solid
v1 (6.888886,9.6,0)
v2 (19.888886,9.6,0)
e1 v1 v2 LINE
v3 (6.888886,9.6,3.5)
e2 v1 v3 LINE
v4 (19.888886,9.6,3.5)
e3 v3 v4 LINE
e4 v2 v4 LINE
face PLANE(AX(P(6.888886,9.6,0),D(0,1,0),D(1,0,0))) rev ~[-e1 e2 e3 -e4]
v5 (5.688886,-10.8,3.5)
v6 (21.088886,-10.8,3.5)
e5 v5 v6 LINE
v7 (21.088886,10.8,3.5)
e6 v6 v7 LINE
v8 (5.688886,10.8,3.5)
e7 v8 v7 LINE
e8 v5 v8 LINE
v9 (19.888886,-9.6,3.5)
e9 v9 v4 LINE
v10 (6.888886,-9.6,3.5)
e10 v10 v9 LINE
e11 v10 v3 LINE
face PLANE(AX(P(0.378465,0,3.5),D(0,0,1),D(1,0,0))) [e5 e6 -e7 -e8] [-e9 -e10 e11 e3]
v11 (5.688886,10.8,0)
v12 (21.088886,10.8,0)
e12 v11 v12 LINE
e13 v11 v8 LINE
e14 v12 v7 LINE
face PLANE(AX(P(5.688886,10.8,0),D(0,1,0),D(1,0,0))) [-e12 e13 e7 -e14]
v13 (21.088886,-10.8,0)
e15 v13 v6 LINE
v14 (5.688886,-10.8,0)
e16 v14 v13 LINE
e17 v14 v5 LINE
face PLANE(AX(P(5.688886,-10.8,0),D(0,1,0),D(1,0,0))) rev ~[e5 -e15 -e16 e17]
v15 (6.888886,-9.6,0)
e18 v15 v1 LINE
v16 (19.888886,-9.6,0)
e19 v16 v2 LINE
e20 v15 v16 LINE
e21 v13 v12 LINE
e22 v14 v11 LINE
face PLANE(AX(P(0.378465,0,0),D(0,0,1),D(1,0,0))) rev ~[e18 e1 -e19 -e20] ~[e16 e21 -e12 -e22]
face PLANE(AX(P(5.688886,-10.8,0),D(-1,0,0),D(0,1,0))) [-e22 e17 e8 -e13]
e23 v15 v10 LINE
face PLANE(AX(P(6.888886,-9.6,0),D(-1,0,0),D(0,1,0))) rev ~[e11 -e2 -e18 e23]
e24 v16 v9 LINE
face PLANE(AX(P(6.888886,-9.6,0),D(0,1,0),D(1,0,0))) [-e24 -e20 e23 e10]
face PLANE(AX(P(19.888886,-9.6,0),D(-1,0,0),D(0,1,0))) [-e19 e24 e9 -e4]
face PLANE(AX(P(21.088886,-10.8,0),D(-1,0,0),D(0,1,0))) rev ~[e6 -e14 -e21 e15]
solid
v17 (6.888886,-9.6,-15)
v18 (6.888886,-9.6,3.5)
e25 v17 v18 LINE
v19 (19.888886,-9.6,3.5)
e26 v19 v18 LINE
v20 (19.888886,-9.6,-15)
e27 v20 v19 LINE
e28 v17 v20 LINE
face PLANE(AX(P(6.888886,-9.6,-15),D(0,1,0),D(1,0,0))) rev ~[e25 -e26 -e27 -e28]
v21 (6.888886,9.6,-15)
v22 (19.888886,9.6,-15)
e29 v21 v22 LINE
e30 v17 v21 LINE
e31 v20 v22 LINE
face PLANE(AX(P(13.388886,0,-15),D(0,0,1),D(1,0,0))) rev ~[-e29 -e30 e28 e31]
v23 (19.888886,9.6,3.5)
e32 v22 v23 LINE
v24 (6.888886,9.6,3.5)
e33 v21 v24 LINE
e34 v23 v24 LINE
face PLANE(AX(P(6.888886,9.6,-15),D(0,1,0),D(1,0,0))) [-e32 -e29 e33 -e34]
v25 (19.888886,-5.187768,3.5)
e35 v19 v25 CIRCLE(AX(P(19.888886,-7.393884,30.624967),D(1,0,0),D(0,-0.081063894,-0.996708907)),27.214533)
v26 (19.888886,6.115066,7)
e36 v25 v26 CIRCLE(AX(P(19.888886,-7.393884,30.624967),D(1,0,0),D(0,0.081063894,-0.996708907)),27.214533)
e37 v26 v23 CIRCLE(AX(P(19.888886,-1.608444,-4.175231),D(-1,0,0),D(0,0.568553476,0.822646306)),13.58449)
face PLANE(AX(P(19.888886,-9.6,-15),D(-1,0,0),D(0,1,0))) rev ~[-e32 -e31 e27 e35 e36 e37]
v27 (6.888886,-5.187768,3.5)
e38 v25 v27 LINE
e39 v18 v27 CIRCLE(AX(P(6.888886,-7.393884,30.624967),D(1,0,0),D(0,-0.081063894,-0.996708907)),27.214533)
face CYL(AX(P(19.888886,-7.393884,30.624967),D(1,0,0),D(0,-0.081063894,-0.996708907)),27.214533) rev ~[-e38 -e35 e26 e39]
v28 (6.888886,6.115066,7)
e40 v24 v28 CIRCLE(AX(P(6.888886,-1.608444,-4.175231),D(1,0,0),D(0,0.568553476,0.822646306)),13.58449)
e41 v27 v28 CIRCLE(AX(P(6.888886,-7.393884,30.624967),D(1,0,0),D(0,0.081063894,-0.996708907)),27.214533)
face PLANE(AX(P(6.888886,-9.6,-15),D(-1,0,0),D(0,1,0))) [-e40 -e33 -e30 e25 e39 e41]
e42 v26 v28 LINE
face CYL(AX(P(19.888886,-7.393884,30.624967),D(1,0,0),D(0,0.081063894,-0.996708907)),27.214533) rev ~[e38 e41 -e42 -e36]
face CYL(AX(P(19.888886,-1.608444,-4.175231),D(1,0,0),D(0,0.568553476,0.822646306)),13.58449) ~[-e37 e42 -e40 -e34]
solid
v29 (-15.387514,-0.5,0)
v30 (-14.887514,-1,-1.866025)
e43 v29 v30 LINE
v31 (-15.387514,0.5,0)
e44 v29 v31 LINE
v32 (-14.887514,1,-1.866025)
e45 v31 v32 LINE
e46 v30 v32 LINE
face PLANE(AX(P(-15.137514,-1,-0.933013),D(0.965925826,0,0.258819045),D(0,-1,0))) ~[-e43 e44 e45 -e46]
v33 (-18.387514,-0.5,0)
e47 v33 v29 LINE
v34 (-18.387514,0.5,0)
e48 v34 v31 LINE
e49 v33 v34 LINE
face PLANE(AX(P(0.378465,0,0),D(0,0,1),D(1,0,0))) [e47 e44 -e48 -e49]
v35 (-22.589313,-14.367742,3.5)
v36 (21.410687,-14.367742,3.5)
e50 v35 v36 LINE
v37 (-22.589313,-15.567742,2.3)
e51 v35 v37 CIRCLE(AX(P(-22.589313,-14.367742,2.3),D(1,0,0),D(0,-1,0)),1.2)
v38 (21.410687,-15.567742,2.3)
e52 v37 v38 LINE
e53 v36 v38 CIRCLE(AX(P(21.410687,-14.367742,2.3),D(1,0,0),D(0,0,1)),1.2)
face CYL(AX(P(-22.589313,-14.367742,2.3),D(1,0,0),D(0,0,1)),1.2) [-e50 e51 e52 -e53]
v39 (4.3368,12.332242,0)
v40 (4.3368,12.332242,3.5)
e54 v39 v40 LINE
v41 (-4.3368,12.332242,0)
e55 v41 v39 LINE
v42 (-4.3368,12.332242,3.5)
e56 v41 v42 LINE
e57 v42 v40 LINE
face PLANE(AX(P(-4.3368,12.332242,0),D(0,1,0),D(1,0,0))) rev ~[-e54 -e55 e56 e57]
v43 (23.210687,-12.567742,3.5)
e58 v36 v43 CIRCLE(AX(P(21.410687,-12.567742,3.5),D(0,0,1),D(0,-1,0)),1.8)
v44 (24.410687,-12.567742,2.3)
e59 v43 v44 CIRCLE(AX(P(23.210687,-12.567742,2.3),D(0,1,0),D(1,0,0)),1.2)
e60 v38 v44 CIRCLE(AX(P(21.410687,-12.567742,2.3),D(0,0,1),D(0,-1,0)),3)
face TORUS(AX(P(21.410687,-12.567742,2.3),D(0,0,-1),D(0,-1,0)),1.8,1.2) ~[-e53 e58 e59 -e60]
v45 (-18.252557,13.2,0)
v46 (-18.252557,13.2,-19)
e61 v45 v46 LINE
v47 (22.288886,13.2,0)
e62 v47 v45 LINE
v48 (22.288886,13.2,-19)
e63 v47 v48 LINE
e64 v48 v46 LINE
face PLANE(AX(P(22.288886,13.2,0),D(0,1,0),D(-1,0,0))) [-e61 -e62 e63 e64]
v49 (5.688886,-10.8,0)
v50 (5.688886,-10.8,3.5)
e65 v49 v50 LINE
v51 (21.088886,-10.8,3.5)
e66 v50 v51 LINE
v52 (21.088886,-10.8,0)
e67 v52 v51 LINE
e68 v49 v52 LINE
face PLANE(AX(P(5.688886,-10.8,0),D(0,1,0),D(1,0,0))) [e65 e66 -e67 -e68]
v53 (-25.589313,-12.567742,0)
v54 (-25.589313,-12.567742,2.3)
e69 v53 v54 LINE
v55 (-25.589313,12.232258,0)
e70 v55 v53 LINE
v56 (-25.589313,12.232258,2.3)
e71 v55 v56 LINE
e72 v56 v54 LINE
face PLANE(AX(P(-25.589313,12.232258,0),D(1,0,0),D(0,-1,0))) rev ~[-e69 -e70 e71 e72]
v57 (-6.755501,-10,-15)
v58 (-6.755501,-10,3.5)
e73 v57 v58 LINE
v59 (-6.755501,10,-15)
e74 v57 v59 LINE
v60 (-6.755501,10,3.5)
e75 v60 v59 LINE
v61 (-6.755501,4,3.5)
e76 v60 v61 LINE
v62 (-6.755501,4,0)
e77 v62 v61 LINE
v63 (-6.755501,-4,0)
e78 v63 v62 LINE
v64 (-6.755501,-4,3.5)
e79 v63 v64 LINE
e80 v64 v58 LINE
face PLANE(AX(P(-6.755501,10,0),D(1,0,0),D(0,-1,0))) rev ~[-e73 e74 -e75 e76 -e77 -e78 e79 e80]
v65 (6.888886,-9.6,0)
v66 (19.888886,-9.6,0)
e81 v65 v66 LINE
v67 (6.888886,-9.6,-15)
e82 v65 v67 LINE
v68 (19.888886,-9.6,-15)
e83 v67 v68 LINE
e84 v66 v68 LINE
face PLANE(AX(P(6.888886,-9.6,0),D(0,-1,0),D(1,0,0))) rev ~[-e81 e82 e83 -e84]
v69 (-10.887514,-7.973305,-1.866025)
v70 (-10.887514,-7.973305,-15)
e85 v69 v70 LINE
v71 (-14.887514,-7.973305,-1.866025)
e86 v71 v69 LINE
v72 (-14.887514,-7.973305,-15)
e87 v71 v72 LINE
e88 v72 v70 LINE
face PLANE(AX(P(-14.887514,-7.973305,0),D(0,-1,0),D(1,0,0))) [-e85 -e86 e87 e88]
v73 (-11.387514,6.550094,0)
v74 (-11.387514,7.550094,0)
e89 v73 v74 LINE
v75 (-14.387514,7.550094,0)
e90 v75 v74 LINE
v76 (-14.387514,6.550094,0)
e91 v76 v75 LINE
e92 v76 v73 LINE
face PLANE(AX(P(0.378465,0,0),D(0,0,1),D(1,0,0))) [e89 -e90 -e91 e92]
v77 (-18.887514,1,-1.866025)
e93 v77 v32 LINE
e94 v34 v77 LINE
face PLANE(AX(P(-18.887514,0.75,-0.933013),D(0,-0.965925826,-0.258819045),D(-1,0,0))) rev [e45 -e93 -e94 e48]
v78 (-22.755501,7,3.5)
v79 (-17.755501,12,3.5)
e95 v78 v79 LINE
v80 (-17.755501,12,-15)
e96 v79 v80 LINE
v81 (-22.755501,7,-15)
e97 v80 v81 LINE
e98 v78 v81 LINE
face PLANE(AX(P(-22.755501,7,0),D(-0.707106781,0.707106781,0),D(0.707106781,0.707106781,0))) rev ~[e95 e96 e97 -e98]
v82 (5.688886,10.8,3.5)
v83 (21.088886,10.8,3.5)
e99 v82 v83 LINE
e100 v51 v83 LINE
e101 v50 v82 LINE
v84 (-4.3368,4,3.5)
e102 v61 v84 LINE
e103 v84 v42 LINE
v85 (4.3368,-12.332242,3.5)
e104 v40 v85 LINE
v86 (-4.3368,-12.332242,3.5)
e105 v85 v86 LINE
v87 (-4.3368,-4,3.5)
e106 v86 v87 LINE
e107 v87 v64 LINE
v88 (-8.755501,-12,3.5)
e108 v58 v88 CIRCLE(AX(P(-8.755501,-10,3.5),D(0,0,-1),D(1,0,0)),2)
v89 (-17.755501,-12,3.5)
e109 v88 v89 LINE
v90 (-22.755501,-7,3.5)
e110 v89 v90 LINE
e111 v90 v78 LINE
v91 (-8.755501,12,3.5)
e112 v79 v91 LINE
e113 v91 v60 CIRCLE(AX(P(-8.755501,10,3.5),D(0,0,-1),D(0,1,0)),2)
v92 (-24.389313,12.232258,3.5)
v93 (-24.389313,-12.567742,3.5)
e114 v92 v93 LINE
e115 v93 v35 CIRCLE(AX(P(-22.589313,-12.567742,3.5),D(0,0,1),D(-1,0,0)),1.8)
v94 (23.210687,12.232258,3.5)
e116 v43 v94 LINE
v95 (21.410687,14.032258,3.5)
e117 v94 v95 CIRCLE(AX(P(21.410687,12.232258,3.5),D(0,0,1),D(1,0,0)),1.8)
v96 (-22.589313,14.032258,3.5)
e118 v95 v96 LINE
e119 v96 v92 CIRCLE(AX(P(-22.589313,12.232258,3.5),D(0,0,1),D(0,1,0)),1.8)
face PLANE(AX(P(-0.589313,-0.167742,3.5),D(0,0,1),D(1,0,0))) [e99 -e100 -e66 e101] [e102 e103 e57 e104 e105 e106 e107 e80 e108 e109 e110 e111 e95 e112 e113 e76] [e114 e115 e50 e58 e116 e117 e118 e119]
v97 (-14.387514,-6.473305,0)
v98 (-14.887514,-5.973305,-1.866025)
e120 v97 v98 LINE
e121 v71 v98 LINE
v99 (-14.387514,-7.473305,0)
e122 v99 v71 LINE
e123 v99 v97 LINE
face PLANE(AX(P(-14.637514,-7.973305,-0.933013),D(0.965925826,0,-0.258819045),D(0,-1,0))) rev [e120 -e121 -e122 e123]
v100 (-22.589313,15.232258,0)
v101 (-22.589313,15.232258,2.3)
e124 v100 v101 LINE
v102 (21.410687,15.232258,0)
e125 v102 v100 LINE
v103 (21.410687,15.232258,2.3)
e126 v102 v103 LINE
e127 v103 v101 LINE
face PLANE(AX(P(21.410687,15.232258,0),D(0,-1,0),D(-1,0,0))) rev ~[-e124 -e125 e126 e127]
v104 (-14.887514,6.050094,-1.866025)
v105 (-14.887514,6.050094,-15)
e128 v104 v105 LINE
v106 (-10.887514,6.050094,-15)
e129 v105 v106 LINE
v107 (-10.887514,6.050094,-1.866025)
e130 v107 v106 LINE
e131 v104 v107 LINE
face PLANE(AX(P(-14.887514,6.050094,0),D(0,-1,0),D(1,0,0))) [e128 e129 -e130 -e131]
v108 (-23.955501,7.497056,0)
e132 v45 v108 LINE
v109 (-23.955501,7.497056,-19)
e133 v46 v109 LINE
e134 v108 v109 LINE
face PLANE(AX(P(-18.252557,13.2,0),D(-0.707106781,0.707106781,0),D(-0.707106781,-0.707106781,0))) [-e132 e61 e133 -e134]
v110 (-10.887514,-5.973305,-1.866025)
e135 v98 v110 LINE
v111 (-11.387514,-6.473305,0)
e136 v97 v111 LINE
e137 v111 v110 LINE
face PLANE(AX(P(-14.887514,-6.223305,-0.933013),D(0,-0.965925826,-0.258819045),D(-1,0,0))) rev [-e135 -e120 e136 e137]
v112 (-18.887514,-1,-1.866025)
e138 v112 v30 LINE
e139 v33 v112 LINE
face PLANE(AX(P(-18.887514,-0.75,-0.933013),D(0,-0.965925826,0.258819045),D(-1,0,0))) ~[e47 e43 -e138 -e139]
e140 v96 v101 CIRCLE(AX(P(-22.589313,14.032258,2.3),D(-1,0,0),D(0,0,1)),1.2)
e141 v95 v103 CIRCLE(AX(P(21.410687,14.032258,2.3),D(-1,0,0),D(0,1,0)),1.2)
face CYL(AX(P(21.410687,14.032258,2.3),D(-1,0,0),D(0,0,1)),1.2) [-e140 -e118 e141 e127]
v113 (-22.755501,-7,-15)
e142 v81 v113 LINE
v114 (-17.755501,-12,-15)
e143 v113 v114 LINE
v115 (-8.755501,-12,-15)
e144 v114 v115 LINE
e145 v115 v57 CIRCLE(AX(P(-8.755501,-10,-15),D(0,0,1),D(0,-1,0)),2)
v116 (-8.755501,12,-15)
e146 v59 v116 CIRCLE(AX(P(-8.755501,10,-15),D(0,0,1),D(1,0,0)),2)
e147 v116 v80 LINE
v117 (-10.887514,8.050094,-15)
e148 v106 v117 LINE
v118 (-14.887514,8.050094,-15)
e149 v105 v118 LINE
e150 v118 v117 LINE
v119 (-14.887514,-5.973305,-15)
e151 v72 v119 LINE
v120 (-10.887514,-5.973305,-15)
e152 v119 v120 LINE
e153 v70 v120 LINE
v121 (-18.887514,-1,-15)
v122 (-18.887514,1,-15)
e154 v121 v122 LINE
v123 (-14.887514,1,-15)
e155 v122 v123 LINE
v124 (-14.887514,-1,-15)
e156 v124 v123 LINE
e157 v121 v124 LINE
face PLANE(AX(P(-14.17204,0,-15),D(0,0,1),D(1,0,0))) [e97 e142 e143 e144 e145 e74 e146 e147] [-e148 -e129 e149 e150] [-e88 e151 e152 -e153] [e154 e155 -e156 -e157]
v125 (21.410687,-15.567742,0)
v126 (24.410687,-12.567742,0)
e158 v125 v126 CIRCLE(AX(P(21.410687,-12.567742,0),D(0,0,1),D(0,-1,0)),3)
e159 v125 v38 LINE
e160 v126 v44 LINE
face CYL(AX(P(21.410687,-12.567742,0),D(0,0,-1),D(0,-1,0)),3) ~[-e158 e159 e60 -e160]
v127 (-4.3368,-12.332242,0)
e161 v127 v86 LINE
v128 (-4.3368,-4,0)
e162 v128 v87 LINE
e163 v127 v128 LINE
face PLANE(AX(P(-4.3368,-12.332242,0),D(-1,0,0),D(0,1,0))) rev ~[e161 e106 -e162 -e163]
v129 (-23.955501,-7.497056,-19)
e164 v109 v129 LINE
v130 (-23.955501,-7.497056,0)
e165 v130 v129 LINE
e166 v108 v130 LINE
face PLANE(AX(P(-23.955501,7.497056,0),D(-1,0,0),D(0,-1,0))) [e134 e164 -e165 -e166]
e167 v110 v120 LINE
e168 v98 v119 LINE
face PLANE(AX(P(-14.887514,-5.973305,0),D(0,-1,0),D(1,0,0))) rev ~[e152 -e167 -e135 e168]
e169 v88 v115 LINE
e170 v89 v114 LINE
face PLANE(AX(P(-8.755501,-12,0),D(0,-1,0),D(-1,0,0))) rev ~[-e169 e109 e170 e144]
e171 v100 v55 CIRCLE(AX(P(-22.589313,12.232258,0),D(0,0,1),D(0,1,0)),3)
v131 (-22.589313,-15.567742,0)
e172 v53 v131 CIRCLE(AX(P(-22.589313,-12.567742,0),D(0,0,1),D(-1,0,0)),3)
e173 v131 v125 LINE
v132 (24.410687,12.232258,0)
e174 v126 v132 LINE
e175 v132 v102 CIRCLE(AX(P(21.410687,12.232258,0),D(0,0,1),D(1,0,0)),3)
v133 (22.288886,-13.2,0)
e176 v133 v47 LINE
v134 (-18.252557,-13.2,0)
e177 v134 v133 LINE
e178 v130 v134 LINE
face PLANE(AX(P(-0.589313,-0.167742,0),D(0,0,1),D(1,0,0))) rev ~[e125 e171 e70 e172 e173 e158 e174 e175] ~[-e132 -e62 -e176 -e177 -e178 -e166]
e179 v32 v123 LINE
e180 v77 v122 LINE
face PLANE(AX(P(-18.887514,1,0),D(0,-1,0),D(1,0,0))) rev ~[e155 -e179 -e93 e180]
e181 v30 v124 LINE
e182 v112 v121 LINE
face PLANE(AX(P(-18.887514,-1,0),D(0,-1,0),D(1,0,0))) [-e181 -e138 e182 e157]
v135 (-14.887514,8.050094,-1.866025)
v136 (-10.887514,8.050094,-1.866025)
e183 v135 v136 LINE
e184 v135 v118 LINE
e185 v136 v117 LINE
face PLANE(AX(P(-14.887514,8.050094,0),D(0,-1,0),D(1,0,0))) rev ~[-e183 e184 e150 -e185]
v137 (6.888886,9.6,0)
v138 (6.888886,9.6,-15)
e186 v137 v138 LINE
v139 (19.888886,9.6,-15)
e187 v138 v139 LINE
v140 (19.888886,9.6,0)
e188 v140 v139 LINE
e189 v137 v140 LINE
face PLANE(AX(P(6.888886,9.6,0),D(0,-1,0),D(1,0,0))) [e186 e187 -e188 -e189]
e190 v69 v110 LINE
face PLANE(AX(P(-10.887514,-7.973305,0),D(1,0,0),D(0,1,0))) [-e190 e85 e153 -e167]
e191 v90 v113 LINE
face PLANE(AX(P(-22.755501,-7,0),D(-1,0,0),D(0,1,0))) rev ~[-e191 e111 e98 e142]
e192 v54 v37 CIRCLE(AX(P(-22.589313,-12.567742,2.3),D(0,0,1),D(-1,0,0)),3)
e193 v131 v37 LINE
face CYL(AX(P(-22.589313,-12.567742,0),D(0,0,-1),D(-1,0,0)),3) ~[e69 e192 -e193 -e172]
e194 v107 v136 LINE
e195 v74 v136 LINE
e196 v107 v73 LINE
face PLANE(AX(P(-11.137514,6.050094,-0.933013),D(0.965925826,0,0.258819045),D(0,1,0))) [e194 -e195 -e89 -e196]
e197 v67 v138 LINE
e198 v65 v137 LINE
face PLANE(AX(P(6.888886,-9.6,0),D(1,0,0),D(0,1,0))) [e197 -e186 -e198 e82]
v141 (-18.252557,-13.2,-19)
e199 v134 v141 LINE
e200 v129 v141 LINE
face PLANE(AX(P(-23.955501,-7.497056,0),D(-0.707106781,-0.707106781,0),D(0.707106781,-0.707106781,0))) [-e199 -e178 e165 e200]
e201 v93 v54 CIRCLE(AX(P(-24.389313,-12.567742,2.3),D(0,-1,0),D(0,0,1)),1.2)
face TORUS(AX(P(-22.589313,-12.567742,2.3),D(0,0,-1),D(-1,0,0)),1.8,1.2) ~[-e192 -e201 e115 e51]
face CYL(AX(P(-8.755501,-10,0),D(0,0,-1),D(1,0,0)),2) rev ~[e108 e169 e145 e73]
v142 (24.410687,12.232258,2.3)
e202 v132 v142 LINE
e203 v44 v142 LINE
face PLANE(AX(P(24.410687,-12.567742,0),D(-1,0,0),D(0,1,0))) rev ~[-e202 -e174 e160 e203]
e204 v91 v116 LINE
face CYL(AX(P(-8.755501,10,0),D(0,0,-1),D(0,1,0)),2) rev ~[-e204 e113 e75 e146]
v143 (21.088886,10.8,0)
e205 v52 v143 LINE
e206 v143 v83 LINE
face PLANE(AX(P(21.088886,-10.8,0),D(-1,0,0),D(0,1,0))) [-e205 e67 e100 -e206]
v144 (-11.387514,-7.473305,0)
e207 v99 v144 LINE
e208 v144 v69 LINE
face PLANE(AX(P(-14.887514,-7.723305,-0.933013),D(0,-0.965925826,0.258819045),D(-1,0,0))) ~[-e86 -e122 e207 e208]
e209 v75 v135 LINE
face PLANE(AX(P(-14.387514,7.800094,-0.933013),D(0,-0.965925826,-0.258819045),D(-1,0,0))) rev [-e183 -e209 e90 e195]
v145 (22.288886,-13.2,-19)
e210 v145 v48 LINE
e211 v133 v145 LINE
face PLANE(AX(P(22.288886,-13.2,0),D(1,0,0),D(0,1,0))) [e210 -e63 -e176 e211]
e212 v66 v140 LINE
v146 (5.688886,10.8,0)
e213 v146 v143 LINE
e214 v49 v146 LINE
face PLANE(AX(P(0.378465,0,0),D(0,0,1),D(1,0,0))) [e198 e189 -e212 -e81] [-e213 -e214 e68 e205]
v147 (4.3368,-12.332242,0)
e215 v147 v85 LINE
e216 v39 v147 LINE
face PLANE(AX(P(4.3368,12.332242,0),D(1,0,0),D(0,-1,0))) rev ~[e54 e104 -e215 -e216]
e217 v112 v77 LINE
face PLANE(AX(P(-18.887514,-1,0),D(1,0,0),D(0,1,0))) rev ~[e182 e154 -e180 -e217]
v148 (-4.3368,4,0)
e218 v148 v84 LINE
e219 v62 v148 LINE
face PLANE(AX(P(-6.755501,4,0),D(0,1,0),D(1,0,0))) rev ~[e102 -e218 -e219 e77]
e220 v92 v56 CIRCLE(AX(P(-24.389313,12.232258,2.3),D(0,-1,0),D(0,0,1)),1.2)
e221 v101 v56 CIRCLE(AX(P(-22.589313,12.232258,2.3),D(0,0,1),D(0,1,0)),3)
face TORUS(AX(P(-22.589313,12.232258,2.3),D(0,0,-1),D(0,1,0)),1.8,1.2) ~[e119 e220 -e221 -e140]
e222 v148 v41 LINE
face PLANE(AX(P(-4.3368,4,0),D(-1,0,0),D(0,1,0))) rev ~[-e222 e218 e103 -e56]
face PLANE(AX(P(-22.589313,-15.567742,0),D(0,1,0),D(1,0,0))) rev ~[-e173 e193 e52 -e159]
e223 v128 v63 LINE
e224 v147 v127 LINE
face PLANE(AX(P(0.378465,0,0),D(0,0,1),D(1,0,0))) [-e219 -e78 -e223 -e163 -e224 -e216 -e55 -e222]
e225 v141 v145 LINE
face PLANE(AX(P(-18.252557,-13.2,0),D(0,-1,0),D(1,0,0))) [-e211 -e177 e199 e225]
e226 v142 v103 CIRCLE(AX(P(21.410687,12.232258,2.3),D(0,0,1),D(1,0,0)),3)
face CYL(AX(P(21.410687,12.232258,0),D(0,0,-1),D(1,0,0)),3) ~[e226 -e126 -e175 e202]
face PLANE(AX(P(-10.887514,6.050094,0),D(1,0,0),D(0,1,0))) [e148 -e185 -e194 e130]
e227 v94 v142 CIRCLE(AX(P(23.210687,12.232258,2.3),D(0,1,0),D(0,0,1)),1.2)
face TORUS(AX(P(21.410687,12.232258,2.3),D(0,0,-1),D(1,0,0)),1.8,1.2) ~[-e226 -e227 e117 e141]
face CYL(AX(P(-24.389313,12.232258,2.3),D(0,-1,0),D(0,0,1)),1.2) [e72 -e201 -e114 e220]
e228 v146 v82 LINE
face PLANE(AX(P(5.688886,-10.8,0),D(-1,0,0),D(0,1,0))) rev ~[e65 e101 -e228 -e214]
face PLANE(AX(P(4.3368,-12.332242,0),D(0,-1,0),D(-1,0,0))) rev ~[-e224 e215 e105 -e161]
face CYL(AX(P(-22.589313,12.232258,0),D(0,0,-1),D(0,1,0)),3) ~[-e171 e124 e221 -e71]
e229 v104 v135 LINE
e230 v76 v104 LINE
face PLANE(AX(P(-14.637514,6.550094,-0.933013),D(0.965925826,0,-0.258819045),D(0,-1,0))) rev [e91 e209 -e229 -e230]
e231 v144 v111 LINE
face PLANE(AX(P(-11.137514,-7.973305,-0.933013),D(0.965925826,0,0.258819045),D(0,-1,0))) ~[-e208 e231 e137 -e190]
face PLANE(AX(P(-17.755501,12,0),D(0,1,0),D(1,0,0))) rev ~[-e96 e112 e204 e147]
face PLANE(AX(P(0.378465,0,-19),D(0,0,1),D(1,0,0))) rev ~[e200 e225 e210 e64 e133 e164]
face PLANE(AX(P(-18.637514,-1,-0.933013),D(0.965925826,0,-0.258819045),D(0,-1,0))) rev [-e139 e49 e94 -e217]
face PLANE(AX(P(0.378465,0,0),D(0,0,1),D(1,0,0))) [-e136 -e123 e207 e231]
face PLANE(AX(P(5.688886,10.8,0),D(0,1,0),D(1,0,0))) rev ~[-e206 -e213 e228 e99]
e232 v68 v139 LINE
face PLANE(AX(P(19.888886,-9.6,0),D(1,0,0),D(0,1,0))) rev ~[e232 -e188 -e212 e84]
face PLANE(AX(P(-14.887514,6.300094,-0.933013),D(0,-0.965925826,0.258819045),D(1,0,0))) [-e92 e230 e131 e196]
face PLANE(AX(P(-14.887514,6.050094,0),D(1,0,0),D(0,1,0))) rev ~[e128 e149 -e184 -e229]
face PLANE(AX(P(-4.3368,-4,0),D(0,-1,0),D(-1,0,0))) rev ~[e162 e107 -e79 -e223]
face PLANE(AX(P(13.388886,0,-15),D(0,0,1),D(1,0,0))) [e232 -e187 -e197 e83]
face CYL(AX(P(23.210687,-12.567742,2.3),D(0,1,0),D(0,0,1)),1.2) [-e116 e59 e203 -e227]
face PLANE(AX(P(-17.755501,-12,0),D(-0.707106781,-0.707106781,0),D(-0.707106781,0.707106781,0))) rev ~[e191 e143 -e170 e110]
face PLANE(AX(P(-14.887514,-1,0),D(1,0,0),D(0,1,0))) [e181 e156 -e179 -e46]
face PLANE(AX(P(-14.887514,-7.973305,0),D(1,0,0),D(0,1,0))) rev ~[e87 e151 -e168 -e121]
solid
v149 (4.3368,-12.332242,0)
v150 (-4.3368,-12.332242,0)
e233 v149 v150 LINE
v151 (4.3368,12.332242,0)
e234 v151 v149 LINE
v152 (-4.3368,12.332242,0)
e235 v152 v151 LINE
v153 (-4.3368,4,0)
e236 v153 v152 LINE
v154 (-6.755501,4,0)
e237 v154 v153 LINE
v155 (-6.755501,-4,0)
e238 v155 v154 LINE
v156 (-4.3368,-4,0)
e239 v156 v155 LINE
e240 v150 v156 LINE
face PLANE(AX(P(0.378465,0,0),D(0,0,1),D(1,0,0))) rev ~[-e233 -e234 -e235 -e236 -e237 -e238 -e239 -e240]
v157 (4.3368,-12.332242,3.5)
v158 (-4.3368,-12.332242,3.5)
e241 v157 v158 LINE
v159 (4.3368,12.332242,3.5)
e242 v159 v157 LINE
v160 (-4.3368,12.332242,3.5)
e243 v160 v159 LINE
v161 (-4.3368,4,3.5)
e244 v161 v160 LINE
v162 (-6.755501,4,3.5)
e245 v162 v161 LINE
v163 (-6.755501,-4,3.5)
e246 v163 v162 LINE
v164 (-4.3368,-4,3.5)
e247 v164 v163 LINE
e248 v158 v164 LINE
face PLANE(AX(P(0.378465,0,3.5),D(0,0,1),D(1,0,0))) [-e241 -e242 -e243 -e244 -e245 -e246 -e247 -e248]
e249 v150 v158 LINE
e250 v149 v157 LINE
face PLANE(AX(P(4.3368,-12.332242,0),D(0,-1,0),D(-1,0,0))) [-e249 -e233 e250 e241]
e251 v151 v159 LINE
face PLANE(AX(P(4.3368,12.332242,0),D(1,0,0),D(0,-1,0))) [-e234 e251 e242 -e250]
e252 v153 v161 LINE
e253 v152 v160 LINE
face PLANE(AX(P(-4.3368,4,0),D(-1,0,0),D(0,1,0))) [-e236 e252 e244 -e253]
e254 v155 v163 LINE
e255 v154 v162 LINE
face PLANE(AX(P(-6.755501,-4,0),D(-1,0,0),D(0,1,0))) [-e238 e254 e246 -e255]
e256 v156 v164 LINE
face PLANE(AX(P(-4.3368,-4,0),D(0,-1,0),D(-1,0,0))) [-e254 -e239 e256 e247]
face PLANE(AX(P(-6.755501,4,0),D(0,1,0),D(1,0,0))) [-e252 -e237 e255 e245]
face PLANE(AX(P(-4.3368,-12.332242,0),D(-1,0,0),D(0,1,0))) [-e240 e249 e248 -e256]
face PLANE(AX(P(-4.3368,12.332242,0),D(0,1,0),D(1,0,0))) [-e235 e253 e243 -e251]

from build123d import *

# Parameters (mm, degrees)
F0_W        = 15.4
F0_H        = 21.6
F1_DEPTH    = 3.5
F0_W_2      = 4
F0_H_2      = 2
F0_W_3      = 13
F0_H_3      = 19.2
F0_W_4      = 2.418700546
F0_H_4      = 8
F2_DEPTH    = 19
F3_DEPTH    = 15
F4_C1_SIZE2 = 0.5
F4_C1_SIZE  = 1.8660254038
F4_C2_SIZE2 = 0.5
F4_C2_SIZE  = 1.8660254038
F4_C3_SIZE2 = 1.8660254038
F4_C3_SIZE  = 0.5
F4_C4_SIZE2 = 1.8660254038
F4_C4_SIZE  = 0.5
F5_SIZE2    = 1.8660254038
F5_SIZE     = 0.5
F6_SIZE2    = 1.8660254038
F6_SIZE     = 0.5
F7_DEPTH    = 3.5
F8_DEPTH    = 22
F10_DEPTH   = 25
F11_R       = 1.2


with BuildPart() as f1:
    # F0 (on Top) → F1 (new body)
    with BuildSketch(Plane.XY):
        with BuildLine():
            Line((21.4106866419, 15.232257545), (-22.5893133581, 15.232257545))
            ThreePointArc((-22.5893133581, 15.232257545), (-24.7106337016, 14.3535778886), (-25.5893133581, 12.232257545))
            Line((-25.5893133581, 12.232257545), (-25.5893133581, -12.567742455))
            ThreePointArc((-25.5893133581, -12.567742455), (-24.7106337016, -14.6890627986), (-22.5893133581, -15.567742455))
            Line((-22.5893133581, -15.567742455), (21.4106866419, -15.567742455))
            ThreePointArc((21.4106866419, -15.567742455), (23.5320069855, -14.6890627986), (24.4106866419, -12.567742455))
            Line((24.4106866419, -12.567742455), (24.4106866419, 12.232257545))
            ThreePointArc((24.4106866419, 12.232257545), (23.5320069855, 14.3535778886), (21.4106866419, 15.232257545))
        make_face()
        Polygon((-18.2525572471, 13.2), (-8.7555009723, 13.2), (22.2888856925, 13.2), (22.2888856925, -13.2), (-8.7555009723, -13.2), (-18.2525572471, -13.2), (-23.9555009723, -7.4970562748), (-23.9555009723, 7.4970562748), align=None, mode=Mode.SUBTRACT)
        Polygon((22.2888856925, 13.2), (-8.7555009723, 13.2), (-18.2525572471, 13.2), (-23.9555009723, 7.4970562748), (-23.9555009723, -7.4970562748), (-18.2525572471, -13.2), (-8.7555009723, -13.2), (22.2888856925, -13.2), align=None)
        with BuildLine():
            Line((-4.3368004262, 4), (-4.3368004262, 12.3322419822))
            Line((-4.3368004262, 12.3322419822), (4.3368004262, 12.3322419822))
            Line((4.3368004262, 12.3322419822), (4.3368004262, -12.3322419822))
            Line((4.3368004262, -12.3322419822), (-4.3368004262, -12.3322419822))
            Line((-4.3368004262, -12.3322419822), (-4.3368004262, -4))
            Line((-4.3368004262, -4), (-6.7555009723, -4))
            Line((-6.7555009723, -4), (-6.7555009723, -10))
            ThreePointArc((-6.7555009723, -10), (-7.3412874099, -11.4142135624), (-8.7555009723, -12))
            Line((-8.7555009723, -12), (-17.7555009723, -12))
            Line((-17.7555009723, -12), (-22.7555009723, -7))
            Line((-22.7555009723, -7), (-22.7555009723, 7))
            Line((-22.7555009723, 7), (-17.7555009723, 12))
            Line((-17.7555009723, 12), (-8.7555009723, 12))
            ThreePointArc((-8.7555009723, 12), (-7.3412874099, 11.4142135624), (-6.7555009723, 10))
            Line((-6.7555009723, 10), (-6.7555009723, 4))
            Line((-6.7555009723, 4), (-4.3368004262, 4))
        make_face(mode=Mode.SUBTRACT)
        with Locations((13.3888856925, 0)):
            Rectangle(F0_W, F0_H, mode=Mode.SUBTRACT)
    extrude(amount=F1_DEPTH)

    # F0 (on Top) → F2 (join)
    with BuildSketch(Plane.XY):
        Polygon((22.2888856925, 13.2), (-8.7555009723, 13.2), (-18.2525572471, 13.2), (-23.9555009723, 7.4970562748), (-23.9555009723, -7.4970562748), (-18.2525572471, -13.2), (-8.7555009723, -13.2), (22.2888856925, -13.2), align=None)
        with BuildLine():
            Line((-4.3368004262, 4), (-4.3368004262, 12.3322419822))
            Line((-4.3368004262, 12.3322419822), (4.3368004262, 12.3322419822))
            Line((4.3368004262, 12.3322419822), (4.3368004262, -12.3322419822))
            Line((4.3368004262, -12.3322419822), (-4.3368004262, -12.3322419822))
            Line((-4.3368004262, -12.3322419822), (-4.3368004262, -4))
            Line((-4.3368004262, -4), (-6.7555009723, -4))
            Line((-6.7555009723, -4), (-6.7555009723, -10))
            ThreePointArc((-6.7555009723, -10), (-7.3412874099, -11.4142135624), (-8.7555009723, -12))
            Line((-8.7555009723, -12), (-17.7555009723, -12))
            Line((-17.7555009723, -12), (-22.7555009723, -7))
            Line((-22.7555009723, -7), (-22.7555009723, 7))
            Line((-22.7555009723, 7), (-17.7555009723, 12))
            Line((-17.7555009723, 12), (-8.7555009723, 12))
            ThreePointArc((-8.7555009723, 12), (-7.3412874099, 11.4142135624), (-6.7555009723, 10))
            Line((-6.7555009723, 10), (-6.7555009723, 4))
            Line((-6.7555009723, 4), (-4.3368004262, 4))
        make_face(mode=Mode.SUBTRACT)
        with Locations((13.3888856925, 0)):
            Rectangle(F0_W, F0_H, mode=Mode.SUBTRACT)
        with BuildLine():
            Line((-6.7555009723, -4), (-6.7555009723, 4))
            Line((-6.7555009723, 4), (-6.7555009723, 10))
            ThreePointArc((-6.7555009723, 10), (-7.3412874099, 11.4142135624), (-8.7555009723, 12))
            Line((-8.7555009723, 12), (-17.7555009723, 12))
            Line((-17.7555009723, 12), (-22.7555009723, 7))
            Line((-22.7555009723, 7), (-22.7555009723, -7))
            Line((-22.7555009723, -7), (-17.7555009723, -12))
            Line((-17.7555009723, -12), (-8.7555009723, -12))
            ThreePointArc((-8.7555009723, -12), (-7.3412874099, -11.4142135624), (-6.7555009723, -10))
            Line((-6.7555009723, -10), (-6.7555009723, -4))
        make_face()
        with Locations((-12.8875139207, -6.9733052514)):
            Rectangle(F0_W_2, F0_H_2, mode=Mode.SUBTRACT)
        with Locations((-16.8875139207, 0)):
            Rectangle(F0_W_2, F0_H_2, mode=Mode.SUBTRACT)
        with Locations((-12.8875139207, 7.0500936662)):
            Rectangle(F0_W_2, F0_H_2, mode=Mode.SUBTRACT)
        with Locations((13.3888856925, 0)):
            Rectangle(F0_W, F0_H)
        with Locations((13.3888856925, 0)):
            Rectangle(F0_W_3, F0_H_3, mode=Mode.SUBTRACT)
        with Locations((13.3888856925, 0)):
            Rectangle(F0_W_3, F0_H_3)
        Polygon((4.3368004262, 12.3322419822), (-4.3368004262, 12.3322419822), (-4.3368004262, 4), (-4.3368004262, -4), (-4.3368004262, -12.3322419822), (4.3368004262, -12.3322419822), align=None)
        with Locations((-5.5461506993, 0)):
            Rectangle(F0_W_4, F0_H_4)
        with Locations((-12.8875139207, -6.9733052514)):
            Rectangle(F0_W_2, F0_H_2)
        with Locations((-16.8875139207, 0)):
            Rectangle(F0_W_2, F0_H_2)
        with Locations((-12.8875139207, 7.0500936662)):
            Rectangle(F0_W_2, F0_H_2)
    extrude(amount=-F2_DEPTH)

    # F0 (on Top) → F3 (cut)
    with BuildSketch(Plane.XY):
        with BuildLine():
            Line((-6.7555009723, -4), (-6.7555009723, 4))
            Line((-6.7555009723, 4), (-6.7555009723, 10))
            ThreePointArc((-6.7555009723, 10), (-7.3412874099, 11.4142135624), (-8.7555009723, 12))
            Line((-8.7555009723, 12), (-17.7555009723, 12))
            Line((-17.7555009723, 12), (-22.7555009723, 7))
            Line((-22.7555009723, 7), (-22.7555009723, -7))
            Line((-22.7555009723, -7), (-17.7555009723, -12))
            Line((-17.7555009723, -12), (-8.7555009723, -12))
            ThreePointArc((-8.7555009723, -12), (-7.3412874099, -11.4142135624), (-6.7555009723, -10))
            Line((-6.7555009723, -10), (-6.7555009723, -4))
        make_face()
        with Locations((-12.8875139207, -6.9733052514)):
            Rectangle(F0_W_2, F0_H_2, mode=Mode.SUBTRACT)
        with Locations((-16.8875139207, 0)):
            Rectangle(F0_W_2, F0_H_2, mode=Mode.SUBTRACT)
        with Locations((-12.8875139207, 7.0500936662)):
            Rectangle(F0_W_2, F0_H_2, mode=Mode.SUBTRACT)
        with Locations((13.3888856925, 0)):
            Rectangle(F0_W_3, F0_H_3)
    extrude(amount=-F3_DEPTH, mode=Mode.SUBTRACT)

    # F4: chamfer of 0.5 x 1.8660254038 on 4 edges, made by hand

    # F4_c1
    f4_c1_edges = [f1.edges().sort_by_distance(p)[0] for p in [
        (-10.8875139207, 7.0500936662, 0),
    ]]
    f4_c1_side = f1.faces().sort_by_distance((-10.8875139207, 7.0500936662, -0.01))[0]
    chamfer(f4_c1_edges, length=F4_C1_SIZE, length2=F4_C1_SIZE2, reference=f4_c1_side)

    # F4_c2
    f4_c2_edges = [f1.edges().sort_by_distance(p)[0] for p in [
        (-13.1375139207, 6.0500936662, 0),
    ]]
    f4_c2_side = f1.faces().sort_by_distance((-13.1375139207, 6.0500936662, -0.01))[0]
    chamfer(f4_c2_edges, length=F4_C2_SIZE, length2=F4_C2_SIZE2, reference=f4_c2_side)

    # F4_c3
    f4_c3_edges = [f1.edges().sort_by_distance(p)[0] for p in [
        (-14.8875139207, 7.3000936662, 0),
    ]]
    f4_c3_side = f1.faces().sort_by_distance((-14.8775139207, 7.3000936662, 0))[0]
    chamfer(f4_c3_edges, length=F4_C3_SIZE, length2=F4_C3_SIZE2, reference=f4_c3_side)

    # F4_c4
    f4_c4_edges = [f1.edges().sort_by_distance(p)[0] for p in [
        (-12.8875139207, 8.0500936662, 0),
    ]]
    f4_c4_side = f1.faces().sort_by_distance((-12.8875139207, 8.0400936662, 0))[0]
    chamfer(f4_c4_edges, length=F4_C4_SIZE, length2=F4_C4_SIZE2, reference=f4_c4_side)

    # F5
    f5_edges = [f1.edges().sort_by_distance(p)[0] for p in [
        (-16.887514, 1, 0),
        (-14.887514, 0, 0),
        (-16.887514, -1, 0),
        (-18.887514, 0, 0),
    ]]
    f5_side = f1.faces().sort_by_distance((-16.887514, 0, 0))[0]
    chamfer(f5_edges, length=F5_SIZE, length2=F5_SIZE2, reference=f5_side)

    # F6
    f6_edges = [f1.edges().sort_by_distance(p)[0] for p in [
        (-14.887514, -6.973305, 0),
        (-12.887514, -5.973305, 0),
        (-10.887514, -6.973305, 0),
        (-12.887514, -7.973305, 0),
    ]]
    f6_side = f1.faces().sort_by_distance((-12.887514, -6.973305, 0))[0]
    chamfer(f6_edges, length=F6_SIZE, length2=F6_SIZE2, reference=f6_side)


with BuildPart() as f7:
    # F7 (new, through all): a face of the model
    f7_faces = [f1.part.faces().sort_by_distance(p)[0] for p in [
        (-0.4600310991, 0, 0),
    ]]
    extrude(f7_faces, amount=F7_DEPTH)


with BuildPart() as f7b:
    # F7#2 (new, through all): a face of the model
    f7_2_faces = [f1.part.faces().sort_by_distance(p)[0] for p in [
        (13.3888856925, -10.5347227865, 0),
    ]]
    extrude(f7_2_faces, amount=F7_DEPTH)


with BuildPart() as f8:
    # F8 (new): a face of the model
    f8_faces = [f1.part.faces().sort_by_distance(p)[0] for p in [
        (13.3888856925, 0, -15),
    ]]
    extrude(f8_faces, amount=F8_DEPTH)

    # F9 (on face) → F10 (cut)
    with BuildSketch(Plane.YZ.offset(19.8888856925)):
        with BuildLine():
            ThreePointArc((-9.6, 3.5), (-7.3938840069, 3.410434439), (-5.1877680138, 3.5))
            Line((-5.1877680138, 3.5), (-9.6, 3.5))
        make_face()
        with BuildLine():
            Line((-9.6, 3.5), (-5.1877680138, 3.5))
            ThreePointArc((-5.1877680138, 3.5), (0.6561669902, 4.6282852574), (6.1150655176, 7))
            Line((6.1150655176, 7), (-9.6, 7))
            Line((-9.6, 7), (-9.6, 3.5))
        make_face()
        with BuildLine():
            ThreePointArc((6.1150655176, 7), (8.0179372576, 5.4097140483), (9.6, 3.5))
            Line((9.6, 3.5), (9.6, 7))
            Line((9.6, 7), (6.1150655176, 7))
        make_face()
    extrude(amount=-F10_DEPTH, mode=Mode.SUBTRACT)


with BuildPart() as f1_1:
    add(f1.part)

    # F11
    f11_edges = [f1_1.edges().sort_by_distance(p)[0] for p in [
        (-25.589313, -0.167742, 3.5),
        (24.410687, -0.167742, 3.5),
        (23.532007, 14.353578, 3.5),
        (-0.589313, 15.232258, 3.5),
        (-24.710634, 14.353578, 3.5),
        (-24.710634, -14.689063, 3.5),
        (-0.589313, -15.567742, 3.5),
        (23.532007, -14.689063, 3.5),
    ]]
    fillet(f11_edges, radius=F11_R)


solid = Compound([f7.part, f7b.part, f8.part, f1_1.part])
